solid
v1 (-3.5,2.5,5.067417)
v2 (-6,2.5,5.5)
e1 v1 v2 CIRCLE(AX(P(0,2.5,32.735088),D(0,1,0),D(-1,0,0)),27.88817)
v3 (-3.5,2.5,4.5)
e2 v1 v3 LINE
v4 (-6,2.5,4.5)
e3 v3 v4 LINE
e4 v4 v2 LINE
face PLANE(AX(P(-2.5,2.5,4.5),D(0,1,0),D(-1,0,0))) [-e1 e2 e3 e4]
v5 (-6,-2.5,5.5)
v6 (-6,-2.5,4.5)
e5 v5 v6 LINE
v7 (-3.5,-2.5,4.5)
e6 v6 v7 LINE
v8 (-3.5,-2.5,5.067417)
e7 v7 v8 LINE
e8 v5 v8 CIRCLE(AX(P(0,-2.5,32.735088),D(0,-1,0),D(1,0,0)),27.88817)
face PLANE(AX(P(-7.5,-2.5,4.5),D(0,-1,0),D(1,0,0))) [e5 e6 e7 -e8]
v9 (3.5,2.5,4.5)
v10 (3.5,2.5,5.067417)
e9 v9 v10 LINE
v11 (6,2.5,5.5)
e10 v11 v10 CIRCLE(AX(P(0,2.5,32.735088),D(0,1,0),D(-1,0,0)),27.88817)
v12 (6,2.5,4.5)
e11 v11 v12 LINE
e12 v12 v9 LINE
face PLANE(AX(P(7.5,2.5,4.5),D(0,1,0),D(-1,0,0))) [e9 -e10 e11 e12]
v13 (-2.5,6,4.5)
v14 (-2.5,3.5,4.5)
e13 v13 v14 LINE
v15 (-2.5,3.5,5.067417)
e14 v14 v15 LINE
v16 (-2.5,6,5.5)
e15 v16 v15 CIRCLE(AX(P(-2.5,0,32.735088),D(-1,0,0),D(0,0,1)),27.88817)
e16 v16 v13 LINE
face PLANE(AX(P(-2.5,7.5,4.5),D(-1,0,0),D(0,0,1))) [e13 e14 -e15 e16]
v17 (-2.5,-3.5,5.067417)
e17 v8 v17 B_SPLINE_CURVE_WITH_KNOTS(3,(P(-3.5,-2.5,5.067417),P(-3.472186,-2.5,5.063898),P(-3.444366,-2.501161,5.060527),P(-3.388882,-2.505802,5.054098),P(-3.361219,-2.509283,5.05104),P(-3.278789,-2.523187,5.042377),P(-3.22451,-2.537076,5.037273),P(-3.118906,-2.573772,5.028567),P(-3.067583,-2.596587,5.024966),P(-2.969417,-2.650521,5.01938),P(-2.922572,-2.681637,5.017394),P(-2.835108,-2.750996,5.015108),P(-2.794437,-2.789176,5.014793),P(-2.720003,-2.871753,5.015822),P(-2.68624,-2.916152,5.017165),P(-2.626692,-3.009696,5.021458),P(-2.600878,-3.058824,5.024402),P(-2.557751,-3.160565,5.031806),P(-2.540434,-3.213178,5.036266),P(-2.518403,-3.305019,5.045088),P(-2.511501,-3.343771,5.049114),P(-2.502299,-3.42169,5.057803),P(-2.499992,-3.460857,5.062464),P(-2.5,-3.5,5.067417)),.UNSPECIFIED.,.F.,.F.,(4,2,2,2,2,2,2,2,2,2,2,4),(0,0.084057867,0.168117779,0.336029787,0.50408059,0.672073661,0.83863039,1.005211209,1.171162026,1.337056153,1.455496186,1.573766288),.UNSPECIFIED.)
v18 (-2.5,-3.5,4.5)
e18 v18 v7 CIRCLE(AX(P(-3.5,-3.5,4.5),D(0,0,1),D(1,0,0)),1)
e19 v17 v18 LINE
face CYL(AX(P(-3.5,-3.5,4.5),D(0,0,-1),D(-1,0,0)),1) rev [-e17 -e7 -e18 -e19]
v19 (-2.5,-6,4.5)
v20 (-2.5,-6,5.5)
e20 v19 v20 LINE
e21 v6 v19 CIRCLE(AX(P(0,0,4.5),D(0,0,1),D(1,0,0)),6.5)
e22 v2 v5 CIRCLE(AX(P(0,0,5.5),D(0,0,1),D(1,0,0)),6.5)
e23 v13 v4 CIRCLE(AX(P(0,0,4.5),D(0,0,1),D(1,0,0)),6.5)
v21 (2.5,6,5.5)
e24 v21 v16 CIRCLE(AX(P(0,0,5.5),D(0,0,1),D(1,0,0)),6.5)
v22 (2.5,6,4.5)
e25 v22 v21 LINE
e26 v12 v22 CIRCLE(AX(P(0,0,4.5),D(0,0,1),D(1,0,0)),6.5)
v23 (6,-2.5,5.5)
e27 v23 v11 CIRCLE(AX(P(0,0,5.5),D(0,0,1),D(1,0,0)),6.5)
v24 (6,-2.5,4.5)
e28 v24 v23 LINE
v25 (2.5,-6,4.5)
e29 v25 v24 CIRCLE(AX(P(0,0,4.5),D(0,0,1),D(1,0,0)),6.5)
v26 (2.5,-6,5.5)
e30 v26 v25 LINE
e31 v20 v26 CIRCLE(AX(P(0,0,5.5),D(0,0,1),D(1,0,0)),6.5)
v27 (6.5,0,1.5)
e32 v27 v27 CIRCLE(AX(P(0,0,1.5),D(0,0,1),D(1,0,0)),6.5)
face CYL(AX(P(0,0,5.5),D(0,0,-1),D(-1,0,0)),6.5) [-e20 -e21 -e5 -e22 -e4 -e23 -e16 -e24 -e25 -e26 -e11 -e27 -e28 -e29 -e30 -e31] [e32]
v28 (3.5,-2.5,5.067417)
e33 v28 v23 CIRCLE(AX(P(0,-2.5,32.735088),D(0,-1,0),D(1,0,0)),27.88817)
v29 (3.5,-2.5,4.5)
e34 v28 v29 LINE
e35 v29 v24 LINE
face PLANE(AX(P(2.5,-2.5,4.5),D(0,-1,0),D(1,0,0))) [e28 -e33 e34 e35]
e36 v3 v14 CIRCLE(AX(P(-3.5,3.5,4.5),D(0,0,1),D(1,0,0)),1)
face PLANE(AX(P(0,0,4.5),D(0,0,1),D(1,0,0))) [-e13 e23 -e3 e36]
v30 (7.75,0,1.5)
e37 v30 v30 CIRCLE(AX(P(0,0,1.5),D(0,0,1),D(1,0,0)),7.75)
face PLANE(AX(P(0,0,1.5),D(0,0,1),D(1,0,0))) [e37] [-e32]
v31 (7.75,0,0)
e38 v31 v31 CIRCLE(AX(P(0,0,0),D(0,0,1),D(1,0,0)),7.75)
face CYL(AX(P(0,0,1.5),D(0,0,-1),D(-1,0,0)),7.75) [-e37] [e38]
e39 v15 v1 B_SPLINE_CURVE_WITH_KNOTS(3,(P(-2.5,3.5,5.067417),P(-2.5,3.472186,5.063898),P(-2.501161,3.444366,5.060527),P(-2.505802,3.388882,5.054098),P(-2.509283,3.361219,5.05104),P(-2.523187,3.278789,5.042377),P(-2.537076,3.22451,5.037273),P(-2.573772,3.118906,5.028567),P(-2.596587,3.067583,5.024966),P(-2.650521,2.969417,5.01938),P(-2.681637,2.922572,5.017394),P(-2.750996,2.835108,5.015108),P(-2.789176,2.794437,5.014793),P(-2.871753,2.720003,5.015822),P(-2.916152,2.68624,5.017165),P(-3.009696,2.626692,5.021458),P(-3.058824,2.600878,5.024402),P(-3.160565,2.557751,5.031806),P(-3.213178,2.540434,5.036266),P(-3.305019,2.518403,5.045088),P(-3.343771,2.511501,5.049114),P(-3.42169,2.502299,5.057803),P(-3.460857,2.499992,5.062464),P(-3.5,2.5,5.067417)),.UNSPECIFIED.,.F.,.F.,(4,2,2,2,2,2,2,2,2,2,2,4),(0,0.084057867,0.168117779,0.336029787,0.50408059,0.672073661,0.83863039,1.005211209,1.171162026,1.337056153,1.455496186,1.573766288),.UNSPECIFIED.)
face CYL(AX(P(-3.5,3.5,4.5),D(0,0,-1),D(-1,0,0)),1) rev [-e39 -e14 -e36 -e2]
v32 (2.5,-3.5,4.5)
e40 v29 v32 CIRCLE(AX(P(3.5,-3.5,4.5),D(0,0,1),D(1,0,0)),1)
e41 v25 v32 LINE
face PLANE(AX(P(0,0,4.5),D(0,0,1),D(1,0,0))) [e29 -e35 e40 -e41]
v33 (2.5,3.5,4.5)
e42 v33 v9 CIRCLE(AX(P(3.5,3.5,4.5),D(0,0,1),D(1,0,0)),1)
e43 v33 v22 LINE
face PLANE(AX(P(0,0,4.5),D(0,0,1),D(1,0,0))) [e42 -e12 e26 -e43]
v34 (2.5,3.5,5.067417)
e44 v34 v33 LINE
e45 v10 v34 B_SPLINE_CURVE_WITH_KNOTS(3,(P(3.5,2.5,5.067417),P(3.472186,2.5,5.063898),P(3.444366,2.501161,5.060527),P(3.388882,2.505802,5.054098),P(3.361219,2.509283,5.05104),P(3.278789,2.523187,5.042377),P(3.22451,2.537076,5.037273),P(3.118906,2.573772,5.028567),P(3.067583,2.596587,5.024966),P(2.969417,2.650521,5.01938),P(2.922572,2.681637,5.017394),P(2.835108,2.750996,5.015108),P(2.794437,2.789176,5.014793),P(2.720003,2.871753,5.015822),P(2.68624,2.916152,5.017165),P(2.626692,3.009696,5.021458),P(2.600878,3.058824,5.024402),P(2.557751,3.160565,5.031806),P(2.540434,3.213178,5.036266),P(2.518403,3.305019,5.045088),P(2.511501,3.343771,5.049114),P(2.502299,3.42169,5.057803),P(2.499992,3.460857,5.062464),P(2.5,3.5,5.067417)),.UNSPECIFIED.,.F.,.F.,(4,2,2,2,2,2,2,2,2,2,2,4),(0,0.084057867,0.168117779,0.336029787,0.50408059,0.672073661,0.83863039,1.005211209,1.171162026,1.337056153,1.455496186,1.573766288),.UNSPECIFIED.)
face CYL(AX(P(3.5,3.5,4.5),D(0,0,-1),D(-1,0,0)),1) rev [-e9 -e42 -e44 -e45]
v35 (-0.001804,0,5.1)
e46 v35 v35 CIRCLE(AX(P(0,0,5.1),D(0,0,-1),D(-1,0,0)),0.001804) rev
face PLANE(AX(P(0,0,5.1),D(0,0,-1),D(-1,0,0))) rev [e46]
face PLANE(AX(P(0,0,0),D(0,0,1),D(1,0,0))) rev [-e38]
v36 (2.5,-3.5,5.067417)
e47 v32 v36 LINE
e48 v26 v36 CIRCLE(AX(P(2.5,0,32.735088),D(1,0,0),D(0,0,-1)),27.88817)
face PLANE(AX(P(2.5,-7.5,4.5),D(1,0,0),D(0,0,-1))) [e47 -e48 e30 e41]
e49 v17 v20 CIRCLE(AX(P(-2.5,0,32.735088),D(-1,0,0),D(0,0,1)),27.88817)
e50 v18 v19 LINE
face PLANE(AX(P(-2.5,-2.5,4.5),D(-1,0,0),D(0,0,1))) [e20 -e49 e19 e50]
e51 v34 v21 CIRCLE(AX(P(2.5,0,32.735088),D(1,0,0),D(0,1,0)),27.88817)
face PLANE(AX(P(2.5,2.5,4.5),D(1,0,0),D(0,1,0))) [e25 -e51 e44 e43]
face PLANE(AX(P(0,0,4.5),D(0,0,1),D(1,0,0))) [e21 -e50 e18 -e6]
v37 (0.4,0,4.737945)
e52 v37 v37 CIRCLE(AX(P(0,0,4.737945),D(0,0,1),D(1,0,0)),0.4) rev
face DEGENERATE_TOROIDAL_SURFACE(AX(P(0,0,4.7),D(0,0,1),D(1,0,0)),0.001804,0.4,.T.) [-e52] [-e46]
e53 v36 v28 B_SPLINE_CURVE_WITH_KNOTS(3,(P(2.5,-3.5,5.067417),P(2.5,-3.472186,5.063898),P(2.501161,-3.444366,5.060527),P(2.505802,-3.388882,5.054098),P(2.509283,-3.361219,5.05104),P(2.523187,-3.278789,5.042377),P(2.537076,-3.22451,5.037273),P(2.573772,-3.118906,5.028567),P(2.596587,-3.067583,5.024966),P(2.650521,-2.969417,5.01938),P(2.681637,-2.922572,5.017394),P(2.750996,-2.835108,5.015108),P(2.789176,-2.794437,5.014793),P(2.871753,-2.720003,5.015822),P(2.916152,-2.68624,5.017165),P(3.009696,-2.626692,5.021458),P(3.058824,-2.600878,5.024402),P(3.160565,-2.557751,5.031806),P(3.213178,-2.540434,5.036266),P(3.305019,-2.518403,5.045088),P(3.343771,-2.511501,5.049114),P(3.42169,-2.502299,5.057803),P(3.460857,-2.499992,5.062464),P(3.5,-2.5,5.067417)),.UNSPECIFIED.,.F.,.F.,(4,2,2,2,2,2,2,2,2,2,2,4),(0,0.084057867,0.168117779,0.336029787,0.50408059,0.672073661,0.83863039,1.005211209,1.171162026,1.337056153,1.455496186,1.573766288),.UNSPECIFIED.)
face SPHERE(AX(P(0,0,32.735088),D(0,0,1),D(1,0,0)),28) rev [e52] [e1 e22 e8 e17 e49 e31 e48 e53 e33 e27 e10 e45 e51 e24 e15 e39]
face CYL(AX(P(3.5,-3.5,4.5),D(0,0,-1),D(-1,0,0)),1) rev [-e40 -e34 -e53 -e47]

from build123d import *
from build123d.topology import SkipClean

# Parameters (mm, degrees)
SKETCH_1_R          = 7.75
EXTRUDE_1_DEPTH     = 1.5
SKETCH_2_R          = 6.5
EXTRUDE_2_DEPTH     = 4
SKETCH_4_W          = 19
SKETCH_4_H          = 19
CUT_EXTRUDE_1_DEPTH = 1
SKETCH_5_R          = 0.4
EXTRUDE_3_DEPTH     = 5.1
FILLET_1_R          = 0.4
FILLET_2_R          = 1


with BuildPart() as part:
    # 草图1 → 凸台-拉伸1 (new body)
    with BuildSketch(Plane.XY):
        Circle(SKETCH_1_R)
    extrude(amount=EXTRUDE_1_DEPTH)

    # 草图2 → 凸台-拉伸2 (add)
    with BuildSketch(Plane.XY.offset(1.5)):
        Circle(SKETCH_2_R)
    extrude(amount=EXTRUDE_2_DEPTH)

    # 草图4 → 切除-拉伸1 (cut)
    with BuildSketch(Plane.XY.offset(5.5)):
        Rectangle(SKETCH_4_W, SKETCH_4_H)
        Polygon((-2.5, 7.5), (-2.5, 2.5), (-7.5, 2.5), (-7.5, -2.5), (-2.5, -2.5), (-2.5, -7.5), (2.5, -7.5), (2.5, -2.5), (7.5, -2.5), (7.5, 2.5), (2.5, 2.5), (2.5, 7.5), align=None, mode=Mode.SUBTRACT)
    extrude(amount=-CUT_EXTRUDE_1_DEPTH, mode=Mode.SUBTRACT)

    # 草图3 → 切除-旋转2 (revolve, cut)
    with SkipClean():  # the faces are left unmerged after this step: merging them gives an invalid solid
        with BuildSketch(Plane(origin=(0, 0, 0), x_dir=(1, 0, 0), z_dir=(0, 1, 0)), mode=Mode.PRIVATE) as cut_revolve_2_sk:
            with BuildLine():
                Line((-6.5, -5.5), (0, -5.5))
                Line((0, -5.5), (0, -4.735087663))
                ThreePointArc((0, -4.735087663), (-3.272426122, -4.926973248), (-6.5, -5.5))
            make_face()
            with BuildLine():
                Line((0, -4.735087663), (0, -5.5))
                Line((0, -5.5), (6.5, -5.5))
                ThreePointArc((6.5, -5.5), (3.272426122, -4.926973248), (0, -4.735087663))
            make_face()
        revolve(cut_revolve_2_sk.sketch.rotate(Axis((0, 0, 1000), (0, 0, -1)), 337.380135052), axis=Axis((0, 0, 1000), (0, 0, -1)), mode=Mode.SUBTRACT)
    add(part.part.scale(1), mode=Mode.REPLACE)  # the faces are merged on a copy

    # 草图5 → 凸台-拉伸3 (add)
    with BuildSketch(Plane(origin=(0, 0, 0), x_dir=(-1, 0, 0), z_dir=(0, 0, -1))):
        Circle(SKETCH_5_R)
    extrude(amount=-EXTRUDE_3_DEPTH)

    # 圆角1
    # the kernel refuses this fillet: 0.4 mm, written as the material it takes off along each edge
    with BuildSketch(Plane(origin=(0, 0, 5.1), x_dir=(-1, 0, 0), z_dir=(0, -1, 0))) as fillet_1_piece_1:
        with BuildLine():
            CenterArc((0.001803842, 0.4), FILLET_1_R, 270, 84.556601085)
            Line((0.001803842, 0), (0.001803842, -0.008))
            Line((0.001803842, -0.008), (0.4, -0.008))
            Line((0.4, -0.008), (0.408, 0))
            ThreePointArc((0.408, 0), (0.408, 0.181027524), (0.407963923, 0.36129615))
            Line((0.407963923, 0.36129615), (0.4, 0.362055049))
        make_face()
    revolve(axis=Axis((0, 0, 5.1), (0, 0, -1)), mode=Mode.SUBTRACT)

    # 圆角2
    fillet_2_edges = [part.edges().sort_by_distance(p)[0] for p in [
        (2.5, 2.5, 4.729599419),
        (2.5, -2.5, 4.729599419),
        (-2.5, -2.5, 4.729599419),
        (-2.5, 2.5, 4.729599419),
    ]]
    fillet(fillet_2_edges, radius=FILLET_2_R)


solid = part.part
